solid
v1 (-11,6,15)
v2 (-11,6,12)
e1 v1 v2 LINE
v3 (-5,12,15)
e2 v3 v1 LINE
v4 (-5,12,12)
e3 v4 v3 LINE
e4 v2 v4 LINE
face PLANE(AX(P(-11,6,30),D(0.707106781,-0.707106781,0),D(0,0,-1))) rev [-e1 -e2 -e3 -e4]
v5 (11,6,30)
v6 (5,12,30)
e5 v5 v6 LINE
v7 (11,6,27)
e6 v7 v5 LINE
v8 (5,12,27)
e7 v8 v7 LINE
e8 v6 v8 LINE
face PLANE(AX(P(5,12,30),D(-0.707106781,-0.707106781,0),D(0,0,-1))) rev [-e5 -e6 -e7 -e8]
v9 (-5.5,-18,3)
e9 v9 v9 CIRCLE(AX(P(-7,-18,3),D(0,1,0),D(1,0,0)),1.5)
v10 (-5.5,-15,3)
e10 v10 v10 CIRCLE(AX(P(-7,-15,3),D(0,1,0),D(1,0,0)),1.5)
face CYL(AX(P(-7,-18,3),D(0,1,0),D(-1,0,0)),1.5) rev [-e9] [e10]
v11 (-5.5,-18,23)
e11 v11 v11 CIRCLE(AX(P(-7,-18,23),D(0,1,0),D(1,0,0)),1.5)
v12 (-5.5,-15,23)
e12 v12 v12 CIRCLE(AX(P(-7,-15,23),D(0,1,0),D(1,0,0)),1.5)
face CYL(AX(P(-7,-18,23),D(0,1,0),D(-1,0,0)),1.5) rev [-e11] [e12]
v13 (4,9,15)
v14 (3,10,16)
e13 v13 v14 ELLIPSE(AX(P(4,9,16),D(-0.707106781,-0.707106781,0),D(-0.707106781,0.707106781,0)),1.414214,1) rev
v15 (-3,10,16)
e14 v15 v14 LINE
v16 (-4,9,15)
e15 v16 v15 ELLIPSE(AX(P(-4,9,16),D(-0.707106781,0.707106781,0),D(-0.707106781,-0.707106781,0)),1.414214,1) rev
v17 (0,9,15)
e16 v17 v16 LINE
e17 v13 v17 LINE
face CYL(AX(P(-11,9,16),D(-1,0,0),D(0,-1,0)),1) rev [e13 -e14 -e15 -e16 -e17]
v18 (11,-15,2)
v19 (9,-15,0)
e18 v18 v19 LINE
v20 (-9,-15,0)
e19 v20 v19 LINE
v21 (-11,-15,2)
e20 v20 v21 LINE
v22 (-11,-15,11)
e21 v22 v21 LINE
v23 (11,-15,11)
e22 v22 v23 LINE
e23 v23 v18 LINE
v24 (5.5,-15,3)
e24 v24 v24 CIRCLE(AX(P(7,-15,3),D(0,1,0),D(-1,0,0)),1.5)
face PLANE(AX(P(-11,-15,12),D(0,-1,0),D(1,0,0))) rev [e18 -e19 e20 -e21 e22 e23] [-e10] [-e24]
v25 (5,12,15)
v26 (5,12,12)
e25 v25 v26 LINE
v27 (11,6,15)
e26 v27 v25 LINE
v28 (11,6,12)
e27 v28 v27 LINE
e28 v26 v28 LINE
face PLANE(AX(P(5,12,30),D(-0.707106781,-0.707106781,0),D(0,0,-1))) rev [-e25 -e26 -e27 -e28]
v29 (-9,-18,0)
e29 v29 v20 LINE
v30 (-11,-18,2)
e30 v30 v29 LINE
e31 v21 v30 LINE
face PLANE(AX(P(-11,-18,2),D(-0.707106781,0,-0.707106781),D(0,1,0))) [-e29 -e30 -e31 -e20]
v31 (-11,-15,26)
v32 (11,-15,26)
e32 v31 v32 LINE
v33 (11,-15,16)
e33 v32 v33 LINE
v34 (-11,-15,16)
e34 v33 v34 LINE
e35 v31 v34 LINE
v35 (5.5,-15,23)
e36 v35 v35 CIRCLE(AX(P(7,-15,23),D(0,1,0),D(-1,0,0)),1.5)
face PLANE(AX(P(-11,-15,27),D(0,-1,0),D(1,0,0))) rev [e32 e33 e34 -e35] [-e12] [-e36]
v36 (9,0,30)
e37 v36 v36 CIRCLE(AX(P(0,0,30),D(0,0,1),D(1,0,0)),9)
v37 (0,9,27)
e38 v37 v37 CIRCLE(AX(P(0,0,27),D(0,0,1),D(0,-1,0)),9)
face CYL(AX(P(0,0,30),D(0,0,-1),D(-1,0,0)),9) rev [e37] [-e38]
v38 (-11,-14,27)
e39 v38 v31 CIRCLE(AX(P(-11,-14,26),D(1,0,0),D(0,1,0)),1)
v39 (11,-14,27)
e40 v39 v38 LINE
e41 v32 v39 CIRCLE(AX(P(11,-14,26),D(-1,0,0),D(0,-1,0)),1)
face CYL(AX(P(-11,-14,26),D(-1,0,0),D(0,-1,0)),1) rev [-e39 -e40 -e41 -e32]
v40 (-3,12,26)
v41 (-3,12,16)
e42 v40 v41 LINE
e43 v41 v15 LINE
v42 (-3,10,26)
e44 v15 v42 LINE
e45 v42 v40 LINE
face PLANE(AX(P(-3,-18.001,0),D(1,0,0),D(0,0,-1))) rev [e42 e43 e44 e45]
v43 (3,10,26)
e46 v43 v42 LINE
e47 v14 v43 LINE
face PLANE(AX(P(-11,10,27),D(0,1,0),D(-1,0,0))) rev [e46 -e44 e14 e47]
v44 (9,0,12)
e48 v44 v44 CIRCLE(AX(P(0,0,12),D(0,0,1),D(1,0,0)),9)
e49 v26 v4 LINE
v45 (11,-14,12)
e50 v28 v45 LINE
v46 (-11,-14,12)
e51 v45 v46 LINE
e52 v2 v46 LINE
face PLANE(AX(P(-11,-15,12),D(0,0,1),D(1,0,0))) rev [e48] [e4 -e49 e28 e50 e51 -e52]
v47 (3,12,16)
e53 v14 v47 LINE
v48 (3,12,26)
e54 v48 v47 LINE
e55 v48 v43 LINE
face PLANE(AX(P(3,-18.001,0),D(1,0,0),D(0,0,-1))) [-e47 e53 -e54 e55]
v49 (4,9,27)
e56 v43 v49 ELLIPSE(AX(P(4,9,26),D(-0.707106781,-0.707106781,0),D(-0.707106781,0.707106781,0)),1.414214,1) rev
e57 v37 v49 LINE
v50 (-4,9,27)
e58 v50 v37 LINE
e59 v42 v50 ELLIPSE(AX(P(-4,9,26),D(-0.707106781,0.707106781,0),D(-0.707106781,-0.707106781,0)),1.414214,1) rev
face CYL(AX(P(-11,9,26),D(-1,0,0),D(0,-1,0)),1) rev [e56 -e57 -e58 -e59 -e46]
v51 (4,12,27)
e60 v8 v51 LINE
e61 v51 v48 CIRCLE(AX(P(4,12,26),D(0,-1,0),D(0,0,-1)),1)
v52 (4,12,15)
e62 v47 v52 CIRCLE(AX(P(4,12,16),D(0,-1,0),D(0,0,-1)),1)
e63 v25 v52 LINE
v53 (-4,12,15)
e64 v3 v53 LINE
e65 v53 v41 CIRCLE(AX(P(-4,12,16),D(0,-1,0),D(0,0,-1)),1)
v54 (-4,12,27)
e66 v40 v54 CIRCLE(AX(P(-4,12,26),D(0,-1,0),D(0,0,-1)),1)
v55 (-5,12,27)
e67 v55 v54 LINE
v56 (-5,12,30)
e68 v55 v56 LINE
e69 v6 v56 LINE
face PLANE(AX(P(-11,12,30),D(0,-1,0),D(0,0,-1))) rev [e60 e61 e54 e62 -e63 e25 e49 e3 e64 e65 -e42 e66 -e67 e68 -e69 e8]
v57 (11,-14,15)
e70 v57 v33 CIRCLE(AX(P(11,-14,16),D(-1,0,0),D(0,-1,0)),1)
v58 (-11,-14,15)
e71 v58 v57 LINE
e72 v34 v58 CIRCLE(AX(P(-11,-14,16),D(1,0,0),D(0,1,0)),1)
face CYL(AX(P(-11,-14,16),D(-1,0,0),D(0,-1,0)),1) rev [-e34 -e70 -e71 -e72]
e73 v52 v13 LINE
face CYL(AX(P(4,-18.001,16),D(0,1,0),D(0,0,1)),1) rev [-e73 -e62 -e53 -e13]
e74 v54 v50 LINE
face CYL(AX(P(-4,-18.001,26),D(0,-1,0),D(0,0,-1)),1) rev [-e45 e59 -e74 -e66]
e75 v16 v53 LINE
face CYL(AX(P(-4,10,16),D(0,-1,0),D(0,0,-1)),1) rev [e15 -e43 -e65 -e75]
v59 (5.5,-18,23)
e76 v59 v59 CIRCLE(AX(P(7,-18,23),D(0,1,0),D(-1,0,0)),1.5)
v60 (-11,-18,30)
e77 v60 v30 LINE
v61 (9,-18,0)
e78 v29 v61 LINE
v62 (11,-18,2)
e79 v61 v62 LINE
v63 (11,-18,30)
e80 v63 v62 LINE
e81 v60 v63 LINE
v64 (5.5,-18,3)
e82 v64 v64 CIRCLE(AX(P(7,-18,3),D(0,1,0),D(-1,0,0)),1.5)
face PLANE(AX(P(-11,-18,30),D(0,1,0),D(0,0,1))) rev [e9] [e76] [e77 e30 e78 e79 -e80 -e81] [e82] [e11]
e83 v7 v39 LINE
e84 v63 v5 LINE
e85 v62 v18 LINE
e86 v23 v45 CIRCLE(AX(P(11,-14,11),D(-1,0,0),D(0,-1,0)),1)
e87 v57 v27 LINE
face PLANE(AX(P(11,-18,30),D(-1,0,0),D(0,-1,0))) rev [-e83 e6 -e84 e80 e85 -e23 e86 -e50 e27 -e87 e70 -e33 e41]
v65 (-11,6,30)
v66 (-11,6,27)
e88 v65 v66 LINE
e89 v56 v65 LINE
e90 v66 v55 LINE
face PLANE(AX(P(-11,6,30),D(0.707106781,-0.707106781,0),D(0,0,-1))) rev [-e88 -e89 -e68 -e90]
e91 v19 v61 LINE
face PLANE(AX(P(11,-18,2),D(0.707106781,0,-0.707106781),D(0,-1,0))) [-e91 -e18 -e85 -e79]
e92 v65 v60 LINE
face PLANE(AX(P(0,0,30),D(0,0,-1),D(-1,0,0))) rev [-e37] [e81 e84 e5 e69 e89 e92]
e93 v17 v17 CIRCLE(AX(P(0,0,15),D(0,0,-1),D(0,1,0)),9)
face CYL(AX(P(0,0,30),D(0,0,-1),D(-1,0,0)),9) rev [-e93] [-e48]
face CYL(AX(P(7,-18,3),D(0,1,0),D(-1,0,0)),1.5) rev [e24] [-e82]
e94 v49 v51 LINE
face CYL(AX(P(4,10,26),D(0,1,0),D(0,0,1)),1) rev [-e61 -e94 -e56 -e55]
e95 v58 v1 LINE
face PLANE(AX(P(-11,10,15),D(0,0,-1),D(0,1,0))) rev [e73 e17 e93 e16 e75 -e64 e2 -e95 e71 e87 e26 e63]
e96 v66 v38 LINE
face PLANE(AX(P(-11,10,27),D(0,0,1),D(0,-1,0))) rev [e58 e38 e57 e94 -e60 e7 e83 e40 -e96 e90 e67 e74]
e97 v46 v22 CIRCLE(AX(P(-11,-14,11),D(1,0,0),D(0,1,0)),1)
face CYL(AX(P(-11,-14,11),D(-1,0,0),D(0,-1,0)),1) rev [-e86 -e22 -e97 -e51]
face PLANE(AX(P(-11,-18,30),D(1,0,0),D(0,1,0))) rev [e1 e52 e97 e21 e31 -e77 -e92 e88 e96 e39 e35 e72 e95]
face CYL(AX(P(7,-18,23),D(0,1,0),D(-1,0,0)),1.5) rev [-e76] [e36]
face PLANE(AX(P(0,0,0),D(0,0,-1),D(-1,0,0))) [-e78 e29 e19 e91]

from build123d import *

# Parameters (mm, degrees)
SKETCH_1_W          = 22
SKETCH_1_H          = 30
SKETCH_1_R          = 9
EXTRUDE_2_DEPTH     = 30
SKETCH_4_W          = 12
SKETCH_4_H          = 25
SKETCH_4_H_2        = 30
CUT_EXTRUDE_3_DEPTH = 42.32795664
CHAMFER_2_SIZE      = 2
CUT_EXTRUDE_4_REACH = 45.829
SKETCH_6_R          = 1.5
CUT_EXTRUDE_5_DEPTH = 42.833001327
CHAMFER_3_SIZE      = 6
FILLET_1_R          = 1


with BuildPart() as part:
    # 草图1 → 凸台-拉伸2 (new body)
    with BuildSketch(Plane.XY):
        with Locations((0, -3)):
            Rectangle(SKETCH_1_W, SKETCH_1_H)
        Circle(SKETCH_1_R, mode=Mode.SUBTRACT)
    extrude(amount=EXTRUDE_2_DEPTH)

    # 草图4 → 切除-拉伸3 (cut, through all)
    with BuildSketch(Plane(origin=(11, 0, 0), x_dir=(0, 0, -1), z_dir=(1, 0, 0))):
        with Locations((-21, -2.5)):
            Rectangle(SKETCH_4_W, SKETCH_4_H)
        with Locations((-6, 0)):
            Rectangle(SKETCH_4_W, SKETCH_4_H_2)
    extrude(amount=-CUT_EXTRUDE_3_DEPTH, mode=Mode.SUBTRACT)

    # 倒角2
    chamfer_2_edges = [part.edges().sort_by_distance(p)[0] for p in [
        (-11, -16.5, 0),
        (11, -16.5, 0),
    ]]
    chamfer(chamfer_2_edges, length=CHAMFER_2_SIZE)

    # 草图5 → 切除-拉伸4 (cut, up to next)
    with BuildSketch(Plane(origin=(0, 12, 0), x_dir=(1, 0, 0), z_dir=(0, 1, 0)), mode=Mode.PRIVATE) as cut_extrude_4_sk1:
        with BuildLine():
            Line((3, -27), (9, -27))
            ThreePointArc((9, -27), (4.757359313, -25.242640687), (3, -21))
            Line((3, -21), (3, -27))
        make_face()
    cut_extrude_4_tool1 = extrude(cut_extrude_4_sk1.sketch, amount=-CUT_EXTRUDE_4_REACH, mode=Mode.PRIVATE) & part.part
    # 草图5 → 切除-拉伸4 (cut, up to next)
    with BuildSketch(Plane(origin=(0, 12, 0), x_dir=(1, 0, 0), z_dir=(0, 1, 0)), mode=Mode.PRIVATE) as cut_extrude_4_sk2:
        with BuildLine():
            Line((9, -27), (11, -27))
            Line((11, -27), (11, -15))
            Line((11, -15), (9, -15))
            ThreePointArc((9, -15), (4.757359313, -16.757359313), (3, -21))
            ThreePointArc((3, -21), (4.757359313, -25.242640687), (9, -27))
        make_face()
    cut_extrude_4_tool2 = extrude(cut_extrude_4_sk2.sketch, amount=-CUT_EXTRUDE_4_REACH, mode=Mode.PRIVATE) & part.part
    # 草图5 → 切除-拉伸4 (cut, up to next)
    with BuildSketch(Plane(origin=(0, 12, 0), x_dir=(1, 0, 0), z_dir=(0, 1, 0)), mode=Mode.PRIVATE) as cut_extrude_4_sk3:
        with BuildLine():
            Line((3, -15), (3, -21))
            ThreePointArc((3, -21), (4.757359313, -16.757359313), (9, -15))
            Line((9, -15), (3, -15))
        make_face()
    cut_extrude_4_tool3 = extrude(cut_extrude_4_sk3.sketch, amount=-CUT_EXTRUDE_4_REACH, mode=Mode.PRIVATE) & part.part
    cut_extrude_4_1 = cut_extrude_4_tool1.solids().sort_by_distance((4.340208, 12, 25.659792))[0]
    add(cut_extrude_4_1, mode=Mode.SUBTRACT)
    cut_extrude_4_2 = cut_extrude_4_tool2.solids().sort_by_distance((7.510217, 12, 21))[0]
    add(cut_extrude_4_2, mode=Mode.SUBTRACT)
    cut_extrude_4_3 = cut_extrude_4_tool3.solids().sort_by_distance((4.340208, 12, 16.340208))[0]
    add(cut_extrude_4_3, mode=Mode.SUBTRACT)
    cut_extrude_4 = cut_extrude_4_1 + cut_extrude_4_2 + cut_extrude_4_3  # 切除-拉伸4 as one shape, for the pattern or mirror that repeats it

    # 镜向1: 切除-拉伸4 across plane
    add(cut_extrude_4.mirror(Plane(origin=(0, 0, 0), x_dir=(0, 0, 1), z_dir=(1, 0, 0))), mode=Mode.SUBTRACT)

    # 草图6 → 切除-拉伸5 (cut, through all)
    with BuildSketch(Plane(origin=(0, -15, 0), x_dir=(1, 0, 0), z_dir=(0, 1, 0))):
        with Locations(Location((7, -23, 0), (0, 0, 180))):
            Circle(SKETCH_6_R)
        with Locations(Location((7, -3, 0), (0, 0, 180))):
            Circle(SKETCH_6_R)
        with Locations((-7, -3)):
            Circle(SKETCH_6_R)
        with Locations((-7, -23)):
            Circle(SKETCH_6_R)
    extrude(amount=-CUT_EXTRUDE_5_DEPTH, mode=Mode.SUBTRACT)

    # 倒角3
    chamfer_3_edges = [part.edges().sort_by_distance(p)[0] for p in [
        (11, 12, 13.5),
        (-11, 12, 28.5),
        (11, 12, 28.5),
        (-11, 12, 13.5),
    ]]
    chamfer(chamfer_3_edges, length=CHAMFER_3_SIZE)

    # 圆角1
    fillet_1_edges = [part.edges().sort_by_distance(p)[0] for p in [
        (0, -15, 27),
        (0, -15, 15),
        (0, -15, 12),
        (3, 11, 27),
        (3, 11, 15),
        (0, 10, 15),
        (0, 10, 27),
        (-3, 11, 27),
        (-3, 11, 15),
    ]]
    fillet(fillet_1_edges, radius=FILLET_1_R - 0.0001)  # a hair under: the kernel refuses the full size


solid = part.part
